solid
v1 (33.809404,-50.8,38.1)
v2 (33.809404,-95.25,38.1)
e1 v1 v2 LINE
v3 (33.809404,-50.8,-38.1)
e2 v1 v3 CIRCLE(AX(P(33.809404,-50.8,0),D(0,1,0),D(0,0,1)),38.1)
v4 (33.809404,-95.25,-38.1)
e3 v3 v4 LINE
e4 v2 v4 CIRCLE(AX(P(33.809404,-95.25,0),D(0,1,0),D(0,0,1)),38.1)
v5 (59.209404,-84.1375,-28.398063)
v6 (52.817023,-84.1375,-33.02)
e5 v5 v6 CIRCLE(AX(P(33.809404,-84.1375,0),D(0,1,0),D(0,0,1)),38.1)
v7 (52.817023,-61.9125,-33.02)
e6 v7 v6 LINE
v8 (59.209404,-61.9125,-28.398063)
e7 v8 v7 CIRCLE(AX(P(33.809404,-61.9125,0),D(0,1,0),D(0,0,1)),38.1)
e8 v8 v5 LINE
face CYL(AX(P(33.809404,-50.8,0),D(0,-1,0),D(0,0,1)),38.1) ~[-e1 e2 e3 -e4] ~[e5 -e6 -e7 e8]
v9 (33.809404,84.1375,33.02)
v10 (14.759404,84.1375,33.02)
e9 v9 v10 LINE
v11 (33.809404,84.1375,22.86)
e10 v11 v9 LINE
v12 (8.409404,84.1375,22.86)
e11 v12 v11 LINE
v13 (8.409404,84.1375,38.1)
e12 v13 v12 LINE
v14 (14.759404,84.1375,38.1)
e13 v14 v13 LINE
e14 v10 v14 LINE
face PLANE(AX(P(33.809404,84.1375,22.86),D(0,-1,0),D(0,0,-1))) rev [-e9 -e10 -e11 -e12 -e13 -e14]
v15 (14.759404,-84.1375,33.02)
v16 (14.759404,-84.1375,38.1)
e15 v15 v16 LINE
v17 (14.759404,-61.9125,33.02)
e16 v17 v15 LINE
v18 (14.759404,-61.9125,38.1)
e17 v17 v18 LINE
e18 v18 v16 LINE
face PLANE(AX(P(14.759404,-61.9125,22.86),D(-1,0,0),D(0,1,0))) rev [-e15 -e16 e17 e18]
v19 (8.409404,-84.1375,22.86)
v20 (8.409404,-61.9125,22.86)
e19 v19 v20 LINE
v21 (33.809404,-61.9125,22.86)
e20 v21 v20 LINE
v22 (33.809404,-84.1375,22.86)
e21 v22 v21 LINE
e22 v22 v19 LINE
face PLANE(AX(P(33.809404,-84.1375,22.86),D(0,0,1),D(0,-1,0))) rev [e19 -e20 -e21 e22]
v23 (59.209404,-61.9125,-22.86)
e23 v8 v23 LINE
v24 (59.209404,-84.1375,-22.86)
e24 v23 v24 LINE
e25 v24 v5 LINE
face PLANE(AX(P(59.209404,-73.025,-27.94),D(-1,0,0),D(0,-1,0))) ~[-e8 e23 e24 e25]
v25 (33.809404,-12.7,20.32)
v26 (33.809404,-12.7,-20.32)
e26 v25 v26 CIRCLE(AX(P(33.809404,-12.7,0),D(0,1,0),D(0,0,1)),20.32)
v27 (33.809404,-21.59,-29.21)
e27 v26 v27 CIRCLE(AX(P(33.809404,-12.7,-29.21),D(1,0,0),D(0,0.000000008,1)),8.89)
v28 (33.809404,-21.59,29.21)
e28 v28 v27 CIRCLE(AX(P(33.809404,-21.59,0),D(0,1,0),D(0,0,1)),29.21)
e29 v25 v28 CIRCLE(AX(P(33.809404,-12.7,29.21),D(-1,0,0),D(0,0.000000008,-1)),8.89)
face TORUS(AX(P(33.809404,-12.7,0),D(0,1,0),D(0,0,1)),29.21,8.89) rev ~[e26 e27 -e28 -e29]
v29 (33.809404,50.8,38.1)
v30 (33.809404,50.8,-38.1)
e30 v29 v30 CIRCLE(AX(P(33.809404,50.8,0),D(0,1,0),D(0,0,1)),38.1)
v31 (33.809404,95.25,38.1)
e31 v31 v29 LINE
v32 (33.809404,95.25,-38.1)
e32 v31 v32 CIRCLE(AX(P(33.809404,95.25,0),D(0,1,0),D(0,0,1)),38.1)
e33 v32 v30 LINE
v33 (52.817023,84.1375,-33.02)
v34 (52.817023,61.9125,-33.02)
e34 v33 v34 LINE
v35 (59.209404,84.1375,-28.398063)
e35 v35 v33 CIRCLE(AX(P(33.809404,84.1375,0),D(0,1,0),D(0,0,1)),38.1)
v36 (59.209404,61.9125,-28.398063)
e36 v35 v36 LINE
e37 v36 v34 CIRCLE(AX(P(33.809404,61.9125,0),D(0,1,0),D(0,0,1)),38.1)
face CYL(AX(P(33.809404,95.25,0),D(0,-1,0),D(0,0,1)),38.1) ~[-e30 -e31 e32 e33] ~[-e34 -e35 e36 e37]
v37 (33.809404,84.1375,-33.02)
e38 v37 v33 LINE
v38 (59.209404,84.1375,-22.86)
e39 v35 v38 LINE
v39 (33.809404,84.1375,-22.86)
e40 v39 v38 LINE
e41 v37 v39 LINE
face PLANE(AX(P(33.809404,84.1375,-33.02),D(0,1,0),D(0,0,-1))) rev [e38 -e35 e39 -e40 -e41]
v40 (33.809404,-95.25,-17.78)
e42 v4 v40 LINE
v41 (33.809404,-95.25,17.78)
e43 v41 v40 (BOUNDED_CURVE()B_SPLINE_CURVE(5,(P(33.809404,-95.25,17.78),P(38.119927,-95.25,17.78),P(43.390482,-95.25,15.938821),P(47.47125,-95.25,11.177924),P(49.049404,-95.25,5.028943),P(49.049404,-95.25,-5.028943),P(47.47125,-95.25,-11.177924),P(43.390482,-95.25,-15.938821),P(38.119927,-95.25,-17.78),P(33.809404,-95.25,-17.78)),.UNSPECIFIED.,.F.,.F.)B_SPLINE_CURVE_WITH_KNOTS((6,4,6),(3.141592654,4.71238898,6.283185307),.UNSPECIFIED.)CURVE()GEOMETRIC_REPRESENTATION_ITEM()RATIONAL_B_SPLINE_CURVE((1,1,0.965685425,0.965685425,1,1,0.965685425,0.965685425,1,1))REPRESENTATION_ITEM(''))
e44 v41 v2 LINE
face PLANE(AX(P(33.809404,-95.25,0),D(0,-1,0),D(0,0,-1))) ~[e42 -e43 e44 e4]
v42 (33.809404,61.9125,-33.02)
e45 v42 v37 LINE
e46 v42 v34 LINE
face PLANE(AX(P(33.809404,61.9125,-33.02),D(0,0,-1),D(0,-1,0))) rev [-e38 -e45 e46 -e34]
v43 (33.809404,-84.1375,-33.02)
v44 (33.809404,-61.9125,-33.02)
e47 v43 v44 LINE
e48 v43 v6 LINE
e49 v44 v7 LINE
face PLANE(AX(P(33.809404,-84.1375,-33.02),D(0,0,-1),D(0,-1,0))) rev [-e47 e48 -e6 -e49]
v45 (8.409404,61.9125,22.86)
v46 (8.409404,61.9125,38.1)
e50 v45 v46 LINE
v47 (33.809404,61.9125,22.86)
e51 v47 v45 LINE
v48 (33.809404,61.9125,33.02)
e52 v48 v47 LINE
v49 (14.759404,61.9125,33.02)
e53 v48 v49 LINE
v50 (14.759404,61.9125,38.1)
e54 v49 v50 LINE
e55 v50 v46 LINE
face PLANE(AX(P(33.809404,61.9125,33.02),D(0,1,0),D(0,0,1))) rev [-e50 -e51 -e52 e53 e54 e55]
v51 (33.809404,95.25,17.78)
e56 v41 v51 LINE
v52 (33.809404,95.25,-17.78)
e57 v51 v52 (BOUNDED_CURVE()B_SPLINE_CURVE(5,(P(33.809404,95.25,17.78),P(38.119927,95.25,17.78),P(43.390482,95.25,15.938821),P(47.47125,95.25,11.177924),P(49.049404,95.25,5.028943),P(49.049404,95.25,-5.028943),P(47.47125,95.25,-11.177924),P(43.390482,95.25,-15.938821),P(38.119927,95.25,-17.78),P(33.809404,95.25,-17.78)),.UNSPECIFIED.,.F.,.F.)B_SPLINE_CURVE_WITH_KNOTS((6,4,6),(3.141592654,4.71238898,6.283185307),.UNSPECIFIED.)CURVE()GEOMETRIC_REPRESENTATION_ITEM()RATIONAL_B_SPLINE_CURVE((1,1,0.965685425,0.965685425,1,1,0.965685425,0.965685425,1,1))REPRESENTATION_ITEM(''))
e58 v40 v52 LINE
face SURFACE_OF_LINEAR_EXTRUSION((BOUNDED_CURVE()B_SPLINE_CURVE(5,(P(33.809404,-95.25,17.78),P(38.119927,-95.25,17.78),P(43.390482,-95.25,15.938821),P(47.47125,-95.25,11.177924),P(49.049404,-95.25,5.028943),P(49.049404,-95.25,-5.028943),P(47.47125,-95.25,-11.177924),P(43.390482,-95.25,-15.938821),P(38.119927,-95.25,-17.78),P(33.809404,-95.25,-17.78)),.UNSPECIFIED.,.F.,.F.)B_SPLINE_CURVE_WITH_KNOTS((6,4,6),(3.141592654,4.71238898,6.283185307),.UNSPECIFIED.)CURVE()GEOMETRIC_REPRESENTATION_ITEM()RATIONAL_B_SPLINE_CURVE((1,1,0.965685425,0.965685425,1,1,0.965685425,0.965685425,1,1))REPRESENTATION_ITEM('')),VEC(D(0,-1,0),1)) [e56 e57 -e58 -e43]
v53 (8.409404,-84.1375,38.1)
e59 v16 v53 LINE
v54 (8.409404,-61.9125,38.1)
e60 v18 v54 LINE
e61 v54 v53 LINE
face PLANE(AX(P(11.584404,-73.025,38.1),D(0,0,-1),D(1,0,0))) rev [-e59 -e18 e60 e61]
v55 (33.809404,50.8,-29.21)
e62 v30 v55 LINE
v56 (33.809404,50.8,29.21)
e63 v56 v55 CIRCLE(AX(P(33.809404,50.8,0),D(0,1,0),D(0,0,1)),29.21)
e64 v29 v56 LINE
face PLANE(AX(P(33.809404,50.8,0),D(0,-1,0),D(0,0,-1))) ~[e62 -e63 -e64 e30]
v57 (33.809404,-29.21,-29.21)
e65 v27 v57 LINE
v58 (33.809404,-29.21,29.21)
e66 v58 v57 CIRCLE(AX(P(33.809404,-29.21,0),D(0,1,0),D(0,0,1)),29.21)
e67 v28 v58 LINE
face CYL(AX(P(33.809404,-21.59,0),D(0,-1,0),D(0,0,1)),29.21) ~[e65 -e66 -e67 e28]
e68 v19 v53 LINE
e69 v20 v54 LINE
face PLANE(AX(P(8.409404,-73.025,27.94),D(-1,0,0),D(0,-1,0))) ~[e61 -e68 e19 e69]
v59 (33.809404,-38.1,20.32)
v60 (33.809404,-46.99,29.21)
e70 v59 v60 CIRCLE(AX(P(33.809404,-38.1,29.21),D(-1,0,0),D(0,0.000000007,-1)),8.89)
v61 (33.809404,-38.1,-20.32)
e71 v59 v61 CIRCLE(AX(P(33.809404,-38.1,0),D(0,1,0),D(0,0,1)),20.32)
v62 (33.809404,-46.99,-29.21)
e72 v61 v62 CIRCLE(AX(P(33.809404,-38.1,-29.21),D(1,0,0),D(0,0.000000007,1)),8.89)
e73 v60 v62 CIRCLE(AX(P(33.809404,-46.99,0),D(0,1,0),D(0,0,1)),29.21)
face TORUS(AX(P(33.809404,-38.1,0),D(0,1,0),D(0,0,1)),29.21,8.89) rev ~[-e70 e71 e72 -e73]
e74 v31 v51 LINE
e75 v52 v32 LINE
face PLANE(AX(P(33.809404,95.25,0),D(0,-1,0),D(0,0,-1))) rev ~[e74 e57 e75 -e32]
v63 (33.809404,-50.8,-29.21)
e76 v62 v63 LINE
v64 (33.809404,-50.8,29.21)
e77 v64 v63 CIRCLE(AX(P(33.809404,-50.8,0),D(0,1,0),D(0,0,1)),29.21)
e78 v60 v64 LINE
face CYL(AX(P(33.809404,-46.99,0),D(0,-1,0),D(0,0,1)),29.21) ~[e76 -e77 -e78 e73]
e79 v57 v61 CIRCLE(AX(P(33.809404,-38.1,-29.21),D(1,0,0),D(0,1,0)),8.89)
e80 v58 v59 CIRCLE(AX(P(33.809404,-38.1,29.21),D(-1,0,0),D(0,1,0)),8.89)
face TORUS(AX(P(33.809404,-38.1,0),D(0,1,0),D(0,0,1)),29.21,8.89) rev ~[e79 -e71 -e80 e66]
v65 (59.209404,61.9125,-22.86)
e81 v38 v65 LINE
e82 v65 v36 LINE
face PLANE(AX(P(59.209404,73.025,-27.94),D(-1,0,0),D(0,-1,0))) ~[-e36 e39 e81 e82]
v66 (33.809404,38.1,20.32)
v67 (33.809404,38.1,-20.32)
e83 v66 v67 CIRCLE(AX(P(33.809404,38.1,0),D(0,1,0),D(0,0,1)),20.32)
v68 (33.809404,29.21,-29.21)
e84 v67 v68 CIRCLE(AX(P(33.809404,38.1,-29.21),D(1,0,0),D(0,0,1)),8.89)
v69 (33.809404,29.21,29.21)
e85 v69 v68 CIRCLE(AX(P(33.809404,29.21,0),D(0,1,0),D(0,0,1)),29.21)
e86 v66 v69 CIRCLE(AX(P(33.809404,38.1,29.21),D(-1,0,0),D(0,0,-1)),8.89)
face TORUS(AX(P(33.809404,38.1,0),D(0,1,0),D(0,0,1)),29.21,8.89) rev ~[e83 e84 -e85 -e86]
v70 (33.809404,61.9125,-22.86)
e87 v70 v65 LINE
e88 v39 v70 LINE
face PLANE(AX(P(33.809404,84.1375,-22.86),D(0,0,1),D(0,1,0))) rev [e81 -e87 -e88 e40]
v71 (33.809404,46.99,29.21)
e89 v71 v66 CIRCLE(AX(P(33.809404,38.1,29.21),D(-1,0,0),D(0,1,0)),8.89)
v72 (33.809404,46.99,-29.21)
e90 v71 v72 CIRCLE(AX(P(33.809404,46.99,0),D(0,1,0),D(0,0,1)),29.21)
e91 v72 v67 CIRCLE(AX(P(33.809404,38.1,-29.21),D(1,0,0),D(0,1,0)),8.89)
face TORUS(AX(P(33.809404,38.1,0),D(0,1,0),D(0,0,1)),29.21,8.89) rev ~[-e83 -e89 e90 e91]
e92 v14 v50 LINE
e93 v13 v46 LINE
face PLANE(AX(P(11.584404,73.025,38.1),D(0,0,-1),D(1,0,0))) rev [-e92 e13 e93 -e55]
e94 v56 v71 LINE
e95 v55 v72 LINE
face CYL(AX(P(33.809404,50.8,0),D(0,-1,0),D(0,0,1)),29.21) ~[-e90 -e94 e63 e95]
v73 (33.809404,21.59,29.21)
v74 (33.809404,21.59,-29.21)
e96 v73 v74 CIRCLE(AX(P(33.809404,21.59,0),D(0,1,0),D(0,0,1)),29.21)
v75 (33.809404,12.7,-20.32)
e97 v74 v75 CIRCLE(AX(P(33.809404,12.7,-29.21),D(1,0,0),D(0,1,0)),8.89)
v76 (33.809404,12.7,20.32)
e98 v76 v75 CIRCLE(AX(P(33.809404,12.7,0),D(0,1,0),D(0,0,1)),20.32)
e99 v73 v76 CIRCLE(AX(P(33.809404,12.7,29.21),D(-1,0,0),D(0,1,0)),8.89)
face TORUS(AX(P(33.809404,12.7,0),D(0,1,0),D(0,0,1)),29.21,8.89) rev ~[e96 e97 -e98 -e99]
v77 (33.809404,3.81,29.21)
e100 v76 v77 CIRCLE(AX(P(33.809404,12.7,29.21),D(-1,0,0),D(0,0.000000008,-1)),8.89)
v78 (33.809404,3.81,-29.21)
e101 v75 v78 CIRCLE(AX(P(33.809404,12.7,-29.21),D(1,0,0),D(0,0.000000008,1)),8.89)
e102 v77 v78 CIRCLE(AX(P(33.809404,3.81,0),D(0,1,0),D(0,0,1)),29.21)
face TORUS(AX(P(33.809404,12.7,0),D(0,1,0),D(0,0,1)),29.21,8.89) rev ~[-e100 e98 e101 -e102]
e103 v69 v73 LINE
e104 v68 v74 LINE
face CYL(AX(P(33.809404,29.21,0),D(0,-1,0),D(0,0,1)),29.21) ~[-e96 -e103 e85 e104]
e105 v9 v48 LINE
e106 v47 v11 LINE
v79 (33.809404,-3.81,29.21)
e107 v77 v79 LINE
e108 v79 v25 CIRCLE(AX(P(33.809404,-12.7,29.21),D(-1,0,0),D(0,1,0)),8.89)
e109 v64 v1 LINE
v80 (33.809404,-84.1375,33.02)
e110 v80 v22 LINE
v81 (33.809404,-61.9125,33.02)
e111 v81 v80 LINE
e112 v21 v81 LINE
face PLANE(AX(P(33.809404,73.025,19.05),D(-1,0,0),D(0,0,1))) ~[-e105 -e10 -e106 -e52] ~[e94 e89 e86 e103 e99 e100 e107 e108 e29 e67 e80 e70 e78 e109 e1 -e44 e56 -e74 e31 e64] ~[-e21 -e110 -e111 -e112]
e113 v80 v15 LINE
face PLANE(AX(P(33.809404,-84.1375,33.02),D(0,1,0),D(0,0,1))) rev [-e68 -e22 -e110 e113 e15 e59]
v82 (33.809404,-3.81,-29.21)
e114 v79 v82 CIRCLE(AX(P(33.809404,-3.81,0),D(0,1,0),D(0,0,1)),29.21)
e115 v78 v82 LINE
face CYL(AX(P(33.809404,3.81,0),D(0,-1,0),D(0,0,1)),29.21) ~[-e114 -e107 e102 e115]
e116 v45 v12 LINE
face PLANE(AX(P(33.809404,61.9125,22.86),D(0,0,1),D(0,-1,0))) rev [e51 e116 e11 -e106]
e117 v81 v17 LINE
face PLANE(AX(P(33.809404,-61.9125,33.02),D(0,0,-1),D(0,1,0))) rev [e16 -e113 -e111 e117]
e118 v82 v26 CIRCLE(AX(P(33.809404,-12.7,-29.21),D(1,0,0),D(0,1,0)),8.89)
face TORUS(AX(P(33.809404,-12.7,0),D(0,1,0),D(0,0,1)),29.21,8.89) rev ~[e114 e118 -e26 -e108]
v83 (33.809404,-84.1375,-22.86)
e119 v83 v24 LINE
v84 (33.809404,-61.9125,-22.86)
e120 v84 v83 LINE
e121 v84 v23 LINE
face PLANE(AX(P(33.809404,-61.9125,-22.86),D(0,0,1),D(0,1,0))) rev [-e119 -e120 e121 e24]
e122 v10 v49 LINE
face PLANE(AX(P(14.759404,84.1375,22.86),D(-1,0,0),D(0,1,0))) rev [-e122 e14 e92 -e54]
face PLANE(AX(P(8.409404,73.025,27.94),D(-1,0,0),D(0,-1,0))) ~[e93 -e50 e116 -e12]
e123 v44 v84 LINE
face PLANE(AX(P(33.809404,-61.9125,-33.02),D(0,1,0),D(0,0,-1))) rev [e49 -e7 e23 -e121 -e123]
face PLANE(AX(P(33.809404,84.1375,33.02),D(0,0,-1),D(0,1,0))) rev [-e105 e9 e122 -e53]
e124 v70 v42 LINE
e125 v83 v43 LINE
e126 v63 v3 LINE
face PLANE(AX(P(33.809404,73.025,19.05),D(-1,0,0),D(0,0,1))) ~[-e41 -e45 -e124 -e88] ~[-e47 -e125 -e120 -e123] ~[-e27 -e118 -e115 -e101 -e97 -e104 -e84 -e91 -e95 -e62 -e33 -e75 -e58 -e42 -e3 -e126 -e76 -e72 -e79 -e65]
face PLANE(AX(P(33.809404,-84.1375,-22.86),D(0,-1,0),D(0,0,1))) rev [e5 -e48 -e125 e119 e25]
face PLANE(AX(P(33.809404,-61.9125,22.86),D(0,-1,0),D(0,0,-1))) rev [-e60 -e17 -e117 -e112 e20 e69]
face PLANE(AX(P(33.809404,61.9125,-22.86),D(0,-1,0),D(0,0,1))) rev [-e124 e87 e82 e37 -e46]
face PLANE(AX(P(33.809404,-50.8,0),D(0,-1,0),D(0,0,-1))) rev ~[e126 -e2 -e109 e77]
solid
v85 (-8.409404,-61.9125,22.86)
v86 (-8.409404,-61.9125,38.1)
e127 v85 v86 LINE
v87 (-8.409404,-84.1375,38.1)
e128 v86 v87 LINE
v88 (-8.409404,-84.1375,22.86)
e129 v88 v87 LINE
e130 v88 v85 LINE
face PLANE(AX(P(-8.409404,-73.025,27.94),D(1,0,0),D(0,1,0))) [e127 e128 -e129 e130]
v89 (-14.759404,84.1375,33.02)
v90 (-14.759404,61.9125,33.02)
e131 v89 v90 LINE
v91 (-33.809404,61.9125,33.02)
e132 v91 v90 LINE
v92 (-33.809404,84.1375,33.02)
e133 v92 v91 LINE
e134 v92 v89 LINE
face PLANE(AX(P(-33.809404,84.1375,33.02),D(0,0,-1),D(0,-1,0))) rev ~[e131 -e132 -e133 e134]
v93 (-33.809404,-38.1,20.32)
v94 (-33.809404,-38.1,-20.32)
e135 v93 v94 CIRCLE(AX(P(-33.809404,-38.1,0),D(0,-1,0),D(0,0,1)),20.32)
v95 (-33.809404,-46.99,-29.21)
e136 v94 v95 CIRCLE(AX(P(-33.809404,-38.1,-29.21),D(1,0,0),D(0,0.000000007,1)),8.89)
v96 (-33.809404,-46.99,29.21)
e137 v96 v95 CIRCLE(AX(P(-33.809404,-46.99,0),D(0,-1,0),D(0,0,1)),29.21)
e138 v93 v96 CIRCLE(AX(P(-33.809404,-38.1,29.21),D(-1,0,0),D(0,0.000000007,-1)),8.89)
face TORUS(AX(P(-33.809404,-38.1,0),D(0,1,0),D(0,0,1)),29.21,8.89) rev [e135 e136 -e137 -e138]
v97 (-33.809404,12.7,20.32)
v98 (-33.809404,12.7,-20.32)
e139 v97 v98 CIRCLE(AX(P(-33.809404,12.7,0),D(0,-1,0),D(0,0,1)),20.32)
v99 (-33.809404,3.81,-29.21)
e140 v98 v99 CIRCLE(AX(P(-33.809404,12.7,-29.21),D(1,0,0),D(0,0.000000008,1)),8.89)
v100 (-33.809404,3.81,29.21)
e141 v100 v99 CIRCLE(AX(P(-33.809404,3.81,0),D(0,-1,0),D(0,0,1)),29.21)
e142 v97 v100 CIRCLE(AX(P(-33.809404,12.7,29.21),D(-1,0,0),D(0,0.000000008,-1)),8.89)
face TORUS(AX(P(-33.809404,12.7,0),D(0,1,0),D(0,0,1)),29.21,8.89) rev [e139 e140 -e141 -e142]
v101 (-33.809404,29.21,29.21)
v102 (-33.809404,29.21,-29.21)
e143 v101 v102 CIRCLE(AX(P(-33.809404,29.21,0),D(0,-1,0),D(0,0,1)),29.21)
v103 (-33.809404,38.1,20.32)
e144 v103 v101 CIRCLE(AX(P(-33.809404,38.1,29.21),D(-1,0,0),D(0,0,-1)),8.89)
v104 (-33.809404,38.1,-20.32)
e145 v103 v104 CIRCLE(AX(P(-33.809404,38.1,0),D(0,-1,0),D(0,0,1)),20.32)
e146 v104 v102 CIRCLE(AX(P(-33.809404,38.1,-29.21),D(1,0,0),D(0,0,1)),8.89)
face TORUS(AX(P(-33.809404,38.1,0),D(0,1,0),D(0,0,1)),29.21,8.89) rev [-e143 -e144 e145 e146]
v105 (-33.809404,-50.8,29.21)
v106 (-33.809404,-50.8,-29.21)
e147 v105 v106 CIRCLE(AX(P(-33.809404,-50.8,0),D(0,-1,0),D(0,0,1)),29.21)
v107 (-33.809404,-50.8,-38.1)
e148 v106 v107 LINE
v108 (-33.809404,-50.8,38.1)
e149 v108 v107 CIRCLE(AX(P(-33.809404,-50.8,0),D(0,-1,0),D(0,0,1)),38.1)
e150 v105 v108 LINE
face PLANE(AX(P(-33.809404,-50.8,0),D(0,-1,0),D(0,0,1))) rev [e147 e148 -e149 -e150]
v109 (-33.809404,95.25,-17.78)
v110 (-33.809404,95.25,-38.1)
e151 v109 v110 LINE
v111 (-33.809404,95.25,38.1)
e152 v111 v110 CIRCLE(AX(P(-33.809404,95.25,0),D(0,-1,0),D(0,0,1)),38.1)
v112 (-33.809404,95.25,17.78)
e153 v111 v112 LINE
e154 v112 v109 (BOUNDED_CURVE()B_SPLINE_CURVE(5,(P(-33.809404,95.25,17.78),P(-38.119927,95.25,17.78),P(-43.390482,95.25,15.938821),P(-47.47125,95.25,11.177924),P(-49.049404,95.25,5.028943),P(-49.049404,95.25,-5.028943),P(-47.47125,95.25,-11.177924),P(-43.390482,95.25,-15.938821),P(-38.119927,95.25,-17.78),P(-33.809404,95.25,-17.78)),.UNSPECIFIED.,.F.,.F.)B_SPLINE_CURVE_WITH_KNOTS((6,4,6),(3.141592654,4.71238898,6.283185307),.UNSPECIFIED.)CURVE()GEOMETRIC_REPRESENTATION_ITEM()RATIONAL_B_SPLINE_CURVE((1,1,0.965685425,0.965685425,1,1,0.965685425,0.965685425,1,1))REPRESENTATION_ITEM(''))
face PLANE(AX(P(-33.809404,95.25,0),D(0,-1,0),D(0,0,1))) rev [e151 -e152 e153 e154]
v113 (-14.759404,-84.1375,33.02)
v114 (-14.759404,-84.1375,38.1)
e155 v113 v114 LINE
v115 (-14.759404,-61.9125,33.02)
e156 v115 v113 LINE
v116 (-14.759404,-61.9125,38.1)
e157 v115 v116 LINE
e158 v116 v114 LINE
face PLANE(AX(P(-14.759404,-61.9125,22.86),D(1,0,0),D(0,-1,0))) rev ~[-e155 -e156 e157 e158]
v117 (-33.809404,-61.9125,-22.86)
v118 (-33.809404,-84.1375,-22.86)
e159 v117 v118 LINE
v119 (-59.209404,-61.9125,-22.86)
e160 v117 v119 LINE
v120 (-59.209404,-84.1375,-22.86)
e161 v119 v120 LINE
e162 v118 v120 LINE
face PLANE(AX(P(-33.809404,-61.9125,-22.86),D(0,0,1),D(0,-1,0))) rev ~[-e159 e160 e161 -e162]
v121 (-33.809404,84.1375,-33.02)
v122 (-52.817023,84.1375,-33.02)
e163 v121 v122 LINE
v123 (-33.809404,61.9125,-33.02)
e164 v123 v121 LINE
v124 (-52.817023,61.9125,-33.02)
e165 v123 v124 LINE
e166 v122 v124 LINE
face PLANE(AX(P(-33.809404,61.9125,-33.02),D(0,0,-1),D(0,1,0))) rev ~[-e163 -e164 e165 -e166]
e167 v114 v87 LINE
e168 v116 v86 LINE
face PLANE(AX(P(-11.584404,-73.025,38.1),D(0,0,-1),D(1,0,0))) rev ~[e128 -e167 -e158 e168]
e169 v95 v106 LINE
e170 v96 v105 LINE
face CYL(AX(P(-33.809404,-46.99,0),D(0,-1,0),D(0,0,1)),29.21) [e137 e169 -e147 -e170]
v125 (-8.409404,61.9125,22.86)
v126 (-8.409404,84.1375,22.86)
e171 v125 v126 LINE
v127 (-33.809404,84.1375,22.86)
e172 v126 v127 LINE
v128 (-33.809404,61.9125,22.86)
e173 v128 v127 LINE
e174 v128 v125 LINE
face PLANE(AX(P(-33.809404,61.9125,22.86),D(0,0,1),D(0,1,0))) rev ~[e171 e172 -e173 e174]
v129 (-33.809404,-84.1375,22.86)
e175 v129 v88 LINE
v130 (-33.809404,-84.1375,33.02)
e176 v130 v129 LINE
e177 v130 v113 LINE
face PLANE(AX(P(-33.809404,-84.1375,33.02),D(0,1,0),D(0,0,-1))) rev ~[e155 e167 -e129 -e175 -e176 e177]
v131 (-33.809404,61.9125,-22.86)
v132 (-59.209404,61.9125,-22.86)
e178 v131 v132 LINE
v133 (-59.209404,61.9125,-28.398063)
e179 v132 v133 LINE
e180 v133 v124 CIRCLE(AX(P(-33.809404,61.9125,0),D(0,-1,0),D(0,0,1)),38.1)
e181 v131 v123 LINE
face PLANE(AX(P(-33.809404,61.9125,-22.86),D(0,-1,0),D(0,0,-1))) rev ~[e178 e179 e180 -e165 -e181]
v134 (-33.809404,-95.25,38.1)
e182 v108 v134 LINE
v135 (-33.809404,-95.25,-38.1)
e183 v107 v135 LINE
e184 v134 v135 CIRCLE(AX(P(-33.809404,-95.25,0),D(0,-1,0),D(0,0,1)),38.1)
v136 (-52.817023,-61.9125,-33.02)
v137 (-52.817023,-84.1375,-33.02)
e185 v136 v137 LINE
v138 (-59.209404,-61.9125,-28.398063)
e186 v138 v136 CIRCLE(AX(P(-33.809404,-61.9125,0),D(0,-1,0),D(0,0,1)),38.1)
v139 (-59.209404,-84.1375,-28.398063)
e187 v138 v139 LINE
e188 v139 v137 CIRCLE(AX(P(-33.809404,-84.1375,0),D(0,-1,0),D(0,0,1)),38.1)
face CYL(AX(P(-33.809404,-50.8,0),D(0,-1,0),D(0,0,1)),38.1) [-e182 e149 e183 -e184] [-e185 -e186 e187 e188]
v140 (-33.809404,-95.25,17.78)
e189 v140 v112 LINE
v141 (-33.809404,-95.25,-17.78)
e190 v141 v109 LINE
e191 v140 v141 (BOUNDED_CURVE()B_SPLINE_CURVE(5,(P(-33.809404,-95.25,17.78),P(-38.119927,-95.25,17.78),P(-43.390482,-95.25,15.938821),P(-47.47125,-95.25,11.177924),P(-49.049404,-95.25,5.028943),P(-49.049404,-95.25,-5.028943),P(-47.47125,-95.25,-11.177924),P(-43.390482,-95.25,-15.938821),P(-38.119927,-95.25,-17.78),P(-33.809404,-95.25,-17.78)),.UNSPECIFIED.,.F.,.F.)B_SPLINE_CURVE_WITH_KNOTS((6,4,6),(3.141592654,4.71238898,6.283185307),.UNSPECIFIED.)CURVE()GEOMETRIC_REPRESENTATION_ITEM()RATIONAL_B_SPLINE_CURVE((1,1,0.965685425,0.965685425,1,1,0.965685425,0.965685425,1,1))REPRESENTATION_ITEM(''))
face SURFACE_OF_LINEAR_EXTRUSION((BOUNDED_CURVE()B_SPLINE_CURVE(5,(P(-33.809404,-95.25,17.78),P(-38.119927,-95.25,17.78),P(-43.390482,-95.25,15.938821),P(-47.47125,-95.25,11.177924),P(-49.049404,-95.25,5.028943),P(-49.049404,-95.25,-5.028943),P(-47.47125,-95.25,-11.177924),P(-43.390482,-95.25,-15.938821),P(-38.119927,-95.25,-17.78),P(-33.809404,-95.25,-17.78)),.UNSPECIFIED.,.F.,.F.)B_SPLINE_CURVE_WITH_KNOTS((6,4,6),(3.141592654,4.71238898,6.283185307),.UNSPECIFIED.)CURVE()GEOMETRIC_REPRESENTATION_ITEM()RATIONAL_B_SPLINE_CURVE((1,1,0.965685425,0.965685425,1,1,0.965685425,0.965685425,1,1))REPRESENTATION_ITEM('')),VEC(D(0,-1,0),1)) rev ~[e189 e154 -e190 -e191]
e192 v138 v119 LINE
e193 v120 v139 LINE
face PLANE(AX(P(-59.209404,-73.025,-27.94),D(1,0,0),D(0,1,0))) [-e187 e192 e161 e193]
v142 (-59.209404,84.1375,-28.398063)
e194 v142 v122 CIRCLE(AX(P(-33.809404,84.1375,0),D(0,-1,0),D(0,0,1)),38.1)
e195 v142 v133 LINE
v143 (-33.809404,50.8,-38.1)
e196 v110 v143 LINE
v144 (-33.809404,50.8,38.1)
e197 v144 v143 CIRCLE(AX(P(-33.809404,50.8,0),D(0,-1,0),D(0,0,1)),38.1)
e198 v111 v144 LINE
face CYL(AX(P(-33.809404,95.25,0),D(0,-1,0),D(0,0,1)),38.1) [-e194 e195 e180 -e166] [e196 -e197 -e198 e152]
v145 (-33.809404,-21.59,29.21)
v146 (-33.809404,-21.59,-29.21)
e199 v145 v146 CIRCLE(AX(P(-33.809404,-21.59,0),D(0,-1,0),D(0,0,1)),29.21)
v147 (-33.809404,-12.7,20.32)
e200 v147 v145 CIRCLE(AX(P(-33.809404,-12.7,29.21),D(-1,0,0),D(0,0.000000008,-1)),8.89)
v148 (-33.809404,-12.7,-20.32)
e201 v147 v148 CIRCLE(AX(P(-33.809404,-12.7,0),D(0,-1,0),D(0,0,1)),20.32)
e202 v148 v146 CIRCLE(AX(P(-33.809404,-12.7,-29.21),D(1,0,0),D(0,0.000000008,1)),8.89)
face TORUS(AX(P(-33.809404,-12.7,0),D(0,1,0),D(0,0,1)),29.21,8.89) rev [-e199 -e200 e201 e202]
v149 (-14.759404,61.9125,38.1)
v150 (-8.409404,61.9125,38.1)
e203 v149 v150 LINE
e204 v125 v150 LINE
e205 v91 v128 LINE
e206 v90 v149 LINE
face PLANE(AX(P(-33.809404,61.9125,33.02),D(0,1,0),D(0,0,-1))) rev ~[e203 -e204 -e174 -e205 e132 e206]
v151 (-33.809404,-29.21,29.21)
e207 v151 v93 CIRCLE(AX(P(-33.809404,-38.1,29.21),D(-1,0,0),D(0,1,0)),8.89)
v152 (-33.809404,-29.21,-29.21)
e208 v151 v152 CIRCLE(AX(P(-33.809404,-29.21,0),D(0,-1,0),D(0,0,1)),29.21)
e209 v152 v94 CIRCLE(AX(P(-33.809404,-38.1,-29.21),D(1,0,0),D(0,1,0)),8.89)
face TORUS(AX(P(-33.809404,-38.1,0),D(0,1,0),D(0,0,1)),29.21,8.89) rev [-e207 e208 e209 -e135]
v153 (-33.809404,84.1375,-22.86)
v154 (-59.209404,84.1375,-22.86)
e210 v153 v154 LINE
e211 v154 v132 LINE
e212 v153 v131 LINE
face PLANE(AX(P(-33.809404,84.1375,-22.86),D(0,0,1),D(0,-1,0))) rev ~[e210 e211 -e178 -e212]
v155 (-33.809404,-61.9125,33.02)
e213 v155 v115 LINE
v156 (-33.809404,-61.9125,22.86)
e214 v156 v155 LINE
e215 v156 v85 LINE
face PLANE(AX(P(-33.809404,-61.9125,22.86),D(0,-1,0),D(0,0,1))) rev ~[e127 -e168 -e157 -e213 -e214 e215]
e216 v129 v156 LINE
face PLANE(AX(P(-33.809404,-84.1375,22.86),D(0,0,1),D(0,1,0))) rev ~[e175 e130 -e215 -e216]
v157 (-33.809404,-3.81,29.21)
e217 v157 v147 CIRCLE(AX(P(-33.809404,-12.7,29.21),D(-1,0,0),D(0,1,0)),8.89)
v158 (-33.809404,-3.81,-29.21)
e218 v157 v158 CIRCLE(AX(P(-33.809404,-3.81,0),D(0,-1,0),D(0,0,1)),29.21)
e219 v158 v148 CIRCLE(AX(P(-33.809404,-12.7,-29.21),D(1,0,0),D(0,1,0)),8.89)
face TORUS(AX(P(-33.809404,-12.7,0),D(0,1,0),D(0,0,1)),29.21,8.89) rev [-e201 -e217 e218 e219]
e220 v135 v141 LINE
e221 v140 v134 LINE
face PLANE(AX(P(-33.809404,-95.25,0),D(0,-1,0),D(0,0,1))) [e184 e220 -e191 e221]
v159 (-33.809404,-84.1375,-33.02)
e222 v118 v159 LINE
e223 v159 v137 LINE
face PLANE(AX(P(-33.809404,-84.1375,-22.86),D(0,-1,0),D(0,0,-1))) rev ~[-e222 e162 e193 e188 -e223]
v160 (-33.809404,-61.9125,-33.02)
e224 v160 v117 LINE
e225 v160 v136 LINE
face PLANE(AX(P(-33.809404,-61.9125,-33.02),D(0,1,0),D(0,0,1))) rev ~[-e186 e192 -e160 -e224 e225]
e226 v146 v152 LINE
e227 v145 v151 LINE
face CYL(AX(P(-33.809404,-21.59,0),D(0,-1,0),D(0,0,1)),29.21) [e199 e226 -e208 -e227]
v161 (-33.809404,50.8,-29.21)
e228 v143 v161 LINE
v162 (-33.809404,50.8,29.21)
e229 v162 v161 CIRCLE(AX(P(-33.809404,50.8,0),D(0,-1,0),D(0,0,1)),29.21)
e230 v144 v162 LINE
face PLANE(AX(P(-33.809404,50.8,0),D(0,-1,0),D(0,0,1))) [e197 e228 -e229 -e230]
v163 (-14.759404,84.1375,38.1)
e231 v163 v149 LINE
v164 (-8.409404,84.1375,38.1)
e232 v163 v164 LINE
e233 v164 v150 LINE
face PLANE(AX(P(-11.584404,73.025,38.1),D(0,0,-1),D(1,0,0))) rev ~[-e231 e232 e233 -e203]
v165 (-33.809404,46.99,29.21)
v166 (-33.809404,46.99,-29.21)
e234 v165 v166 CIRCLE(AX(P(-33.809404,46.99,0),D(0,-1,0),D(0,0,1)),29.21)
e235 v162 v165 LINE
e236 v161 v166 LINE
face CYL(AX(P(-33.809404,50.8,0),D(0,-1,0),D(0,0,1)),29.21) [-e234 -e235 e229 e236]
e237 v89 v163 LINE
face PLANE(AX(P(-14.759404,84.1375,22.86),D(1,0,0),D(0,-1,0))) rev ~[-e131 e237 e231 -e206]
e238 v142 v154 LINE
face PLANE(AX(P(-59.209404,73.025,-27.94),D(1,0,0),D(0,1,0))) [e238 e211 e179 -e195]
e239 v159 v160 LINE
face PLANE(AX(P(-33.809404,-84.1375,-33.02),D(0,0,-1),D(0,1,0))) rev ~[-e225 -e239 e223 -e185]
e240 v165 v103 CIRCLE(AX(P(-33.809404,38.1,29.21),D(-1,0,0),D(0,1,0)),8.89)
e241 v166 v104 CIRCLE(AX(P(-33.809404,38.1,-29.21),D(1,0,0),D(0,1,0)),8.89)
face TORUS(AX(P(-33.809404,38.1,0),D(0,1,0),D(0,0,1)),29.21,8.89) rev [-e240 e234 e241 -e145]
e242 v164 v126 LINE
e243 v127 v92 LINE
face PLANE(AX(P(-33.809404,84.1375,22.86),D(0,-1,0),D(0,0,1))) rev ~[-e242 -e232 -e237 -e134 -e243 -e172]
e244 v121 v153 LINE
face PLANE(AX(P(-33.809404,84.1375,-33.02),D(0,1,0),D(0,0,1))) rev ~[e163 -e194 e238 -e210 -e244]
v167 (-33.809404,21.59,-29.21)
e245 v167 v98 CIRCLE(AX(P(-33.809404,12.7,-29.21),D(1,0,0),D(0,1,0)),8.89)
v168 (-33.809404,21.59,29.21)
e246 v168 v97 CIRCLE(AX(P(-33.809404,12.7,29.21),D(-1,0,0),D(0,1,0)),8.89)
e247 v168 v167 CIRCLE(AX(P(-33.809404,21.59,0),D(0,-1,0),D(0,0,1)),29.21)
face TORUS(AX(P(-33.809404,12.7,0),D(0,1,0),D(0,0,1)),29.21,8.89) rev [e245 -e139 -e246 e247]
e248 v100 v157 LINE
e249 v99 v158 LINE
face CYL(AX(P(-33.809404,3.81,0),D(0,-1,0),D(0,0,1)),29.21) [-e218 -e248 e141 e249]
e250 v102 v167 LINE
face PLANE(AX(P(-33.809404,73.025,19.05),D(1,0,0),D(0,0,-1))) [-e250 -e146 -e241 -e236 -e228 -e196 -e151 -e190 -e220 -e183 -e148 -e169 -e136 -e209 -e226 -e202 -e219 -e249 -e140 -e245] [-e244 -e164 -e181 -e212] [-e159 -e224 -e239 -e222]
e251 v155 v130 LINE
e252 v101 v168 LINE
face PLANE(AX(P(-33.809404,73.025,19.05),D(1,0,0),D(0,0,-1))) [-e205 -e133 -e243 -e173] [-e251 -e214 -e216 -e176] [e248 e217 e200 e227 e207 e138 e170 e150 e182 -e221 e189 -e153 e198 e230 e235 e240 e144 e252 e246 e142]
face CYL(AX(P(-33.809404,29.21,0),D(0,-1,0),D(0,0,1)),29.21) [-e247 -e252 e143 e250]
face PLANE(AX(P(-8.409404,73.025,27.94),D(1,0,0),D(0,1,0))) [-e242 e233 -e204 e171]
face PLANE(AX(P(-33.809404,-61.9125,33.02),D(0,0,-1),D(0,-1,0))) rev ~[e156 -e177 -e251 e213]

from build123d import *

# Parameters (mm, degrees)
F1_ANGLE_BACK = 90
F1_ANGLE      = 180
F3_DEPTH      = 190.5
F5_DEPTH      = 25.4
F7_DEPTH      = 25.4
F9_DEPTH      = 25.4
F11_DEPTH     = 25.4
F13_W         = 6.35
F13_H         = 22.225
F12_W         = 6.35
F12_H         = 22.225
F14_DEPTH     = 15.24


# Not quite as in the source:
# - a feature names something its author has since deleted; it is built from what else it names


with BuildPart() as f1:
    # F0 (on Top) → F1 (revolve)
    with BuildSketch(Plane.XY, mode=Mode.PRIVATE) as f1_sk:
        Polygon((-33.8094037018, 95.25), (-71.9094037018, 95.25), (-71.9094037018, 50.8), (-63.0194037018, 50.8), (-54.1294037018, 50.8), (-33.8094037018, 50.8), align=None)
        Polygon((-33.8094037018, -95.25), (-33.8094037018, 50.8), (-54.1294037018, 50.8), (-54.1294037018, 38.1), (-54.1294037018, 12.7000000718), (-54.1294037018, -12.6999999282), (-54.1294037018, -38.0999999341), (-54.1294037018, -50.8), (-63.0194037018, -50.8), (-71.9094037018, -50.8), (-71.9094037018, -95.25), align=None)
        with BuildLine():
            Line((-54.1294037018, 50.8), (-63.0194037018, 50.8))
            Line((-63.0194037018, 50.8), (-63.0194037018, 46.99))
            ThreePointArc((-63.0194037018, 46.99), (-56.733224417, 44.3861792847), (-54.1294037018, 38.1))
            Line((-54.1294037018, 38.1), (-54.1294037018, 50.8))
        make_face()
        with BuildLine():
            Line((-63.0194037018, -46.99), (-63.0194037018, -50.8))
            Line((-63.0194037018, -50.8), (-54.1294037018, -50.8))
            Line((-54.1294037018, -50.8), (-54.1294037018, -38.0999999341))
            ThreePointArc((-54.1294037018, -38.0999999341), (-56.7332243937, -44.3861792615), (-63.0194037018, -46.99))
        make_face()
        with BuildLine():
            Line((-54.1294037018, 12.7000000718), (-54.1294037018, 38.1))
            ThreePointArc((-54.1294037018, 38.1), (-56.733224417, 31.8138207153), (-63.0194037018, 29.21))
            Line((-63.0194037018, 29.21), (-63.0194037018, 21.59))
            ThreePointArc((-63.0194037018, 21.59), (-56.7332244424, 18.9861793101), (-54.1294037018, 12.7000000718))
        make_face()
        with BuildLine():
            Line((-54.1294037018, -12.6999999282), (-54.1294037018, 12.7000000718))
            ThreePointArc((-54.1294037018, 12.7000000718), (-56.7332243916, 6.4138207406), (-63.0194037018, 3.81))
            Line((-63.0194037018, 3.81), (-63.0194037018, 0))
            Line((-63.0194037018, 0), (-63.0194037018, -3.81))
            ThreePointArc((-63.0194037018, -3.81), (-56.7332244424, -6.4138206899), (-54.1294037018, -12.6999999282))
        make_face()
        with BuildLine():
            Line((-63.0194037018, -21.59), (-63.0194037018, -29.21))
            ThreePointArc((-63.0194037018, -29.21), (-56.7332244403, -31.813820692), (-54.1294037018, -38.0999999341))
            Line((-54.1294037018, -38.0999999341), (-54.1294037018, -12.6999999282))
            ThreePointArc((-54.1294037018, -12.6999999282), (-56.7332243916, -18.9861792594), (-63.0194037018, -21.59))
        make_face()
    revolve(f1_sk.sketch.rotate(Axis((-33.8094037018, 0, 0), (0, -1, 0)), -F1_ANGLE_BACK), axis=Axis((-33.8094037018, 0, 0), (0, -1, 0)), revolution_arc=F1_ANGLE)

    # F2 (on face) → F3 (cut)
    with BuildSketch(Plane.XZ.offset(95.25)):
        with BuildLine():
            add(Edge.make_bspline(
                [(-33.8094037018, 17.78), (-49.0494037018, 17.78), (-49.0494037018, 0)],
                knots=[3.1415926536, 3.1415926536, 3.1415926536, 4.7123889804, 4.7123889804, 4.7123889804], degree=2, weights=[1, 0.7071067812, 1]))
            add(Edge.make_bspline(
                [(-49.0494037018, 0), (-49.0494037018, -17.78), (-33.8094037018, -17.78)],
                knots=[4.7123889804, 4.7123889804, 4.7123889804, 6.2831853072, 6.2831853072, 6.2831853072], degree=2, weights=[1, 0.7071067812, 1]))
            Line((-33.8094037018, -17.78), (-33.8094037018, 17.78))
        make_face()
    extrude(amount=-F3_DEPTH, mode=Mode.SUBTRACT)

    # F4 (on face) → F5 (cut)
    with BuildSketch(Plane.YZ.offset(-33.8094037018)):
        Polygon((-84.1375, -22.86), (-84.1375, -27.94), (-84.1375, -33.02), (-61.9125, -33.02), (-61.9125, -22.86), align=None)
    extrude(amount=-F5_DEPTH, mode=Mode.SUBTRACT)

    # F6 (on face) → F7 (cut)
    with BuildSketch(Plane.YZ.offset(-33.8094037018)):
        Polygon((84.1375, -33.02), (84.1375, -27.94), (84.1375, -22.86), (61.9125, -22.86), (61.9125, -33.02), align=None)
    extrude(amount=-F7_DEPTH, mode=Mode.SUBTRACT)

    # F8 (on face) → F9 (join)
    with BuildSketch(Plane.YZ.offset(-33.8094037018)):
        Polygon((-84.1375, 33.02), (-84.1375, 27.94), (-84.1375, 22.86), (-61.9125, 22.86), (-61.9125, 33.02), align=None)
    extrude(amount=F9_DEPTH)

    # F10 (on face) → F11 (join)
    with BuildSketch(Plane.YZ.offset(-33.8094037018)):
        Polygon((84.1375, 22.86), (84.1375, 27.94), (84.1375, 33.02), (61.9125, 33.02), (61.9125, 22.86), align=None)
    extrude(amount=F11_DEPTH)

    # F13 (on face) + F12 (on face) → F14 (join)
    with BuildSketch(Plane(origin=(0, 0, 22.86), x_dir=(1, 0, 0), z_dir=(0, 0, -1))):
        with Locations((-11.5844037018, 73.025)):
            Rectangle(F13_W, F13_H)
    with BuildSketch(Plane(origin=(0, 0, 22.86), x_dir=(1, 0, 0), z_dir=(0, 0, -1))):
        with Locations((-11.5844037018, -73.025)):
            Rectangle(F12_W, F12_H)
    extrude(amount=-F14_DEPTH)


with BuildPart() as f15_1:
    # F15: instance of F1
    add(f1.part.mirror(Plane.YZ))


solid = Compound([f1.part, f15_1.part])
